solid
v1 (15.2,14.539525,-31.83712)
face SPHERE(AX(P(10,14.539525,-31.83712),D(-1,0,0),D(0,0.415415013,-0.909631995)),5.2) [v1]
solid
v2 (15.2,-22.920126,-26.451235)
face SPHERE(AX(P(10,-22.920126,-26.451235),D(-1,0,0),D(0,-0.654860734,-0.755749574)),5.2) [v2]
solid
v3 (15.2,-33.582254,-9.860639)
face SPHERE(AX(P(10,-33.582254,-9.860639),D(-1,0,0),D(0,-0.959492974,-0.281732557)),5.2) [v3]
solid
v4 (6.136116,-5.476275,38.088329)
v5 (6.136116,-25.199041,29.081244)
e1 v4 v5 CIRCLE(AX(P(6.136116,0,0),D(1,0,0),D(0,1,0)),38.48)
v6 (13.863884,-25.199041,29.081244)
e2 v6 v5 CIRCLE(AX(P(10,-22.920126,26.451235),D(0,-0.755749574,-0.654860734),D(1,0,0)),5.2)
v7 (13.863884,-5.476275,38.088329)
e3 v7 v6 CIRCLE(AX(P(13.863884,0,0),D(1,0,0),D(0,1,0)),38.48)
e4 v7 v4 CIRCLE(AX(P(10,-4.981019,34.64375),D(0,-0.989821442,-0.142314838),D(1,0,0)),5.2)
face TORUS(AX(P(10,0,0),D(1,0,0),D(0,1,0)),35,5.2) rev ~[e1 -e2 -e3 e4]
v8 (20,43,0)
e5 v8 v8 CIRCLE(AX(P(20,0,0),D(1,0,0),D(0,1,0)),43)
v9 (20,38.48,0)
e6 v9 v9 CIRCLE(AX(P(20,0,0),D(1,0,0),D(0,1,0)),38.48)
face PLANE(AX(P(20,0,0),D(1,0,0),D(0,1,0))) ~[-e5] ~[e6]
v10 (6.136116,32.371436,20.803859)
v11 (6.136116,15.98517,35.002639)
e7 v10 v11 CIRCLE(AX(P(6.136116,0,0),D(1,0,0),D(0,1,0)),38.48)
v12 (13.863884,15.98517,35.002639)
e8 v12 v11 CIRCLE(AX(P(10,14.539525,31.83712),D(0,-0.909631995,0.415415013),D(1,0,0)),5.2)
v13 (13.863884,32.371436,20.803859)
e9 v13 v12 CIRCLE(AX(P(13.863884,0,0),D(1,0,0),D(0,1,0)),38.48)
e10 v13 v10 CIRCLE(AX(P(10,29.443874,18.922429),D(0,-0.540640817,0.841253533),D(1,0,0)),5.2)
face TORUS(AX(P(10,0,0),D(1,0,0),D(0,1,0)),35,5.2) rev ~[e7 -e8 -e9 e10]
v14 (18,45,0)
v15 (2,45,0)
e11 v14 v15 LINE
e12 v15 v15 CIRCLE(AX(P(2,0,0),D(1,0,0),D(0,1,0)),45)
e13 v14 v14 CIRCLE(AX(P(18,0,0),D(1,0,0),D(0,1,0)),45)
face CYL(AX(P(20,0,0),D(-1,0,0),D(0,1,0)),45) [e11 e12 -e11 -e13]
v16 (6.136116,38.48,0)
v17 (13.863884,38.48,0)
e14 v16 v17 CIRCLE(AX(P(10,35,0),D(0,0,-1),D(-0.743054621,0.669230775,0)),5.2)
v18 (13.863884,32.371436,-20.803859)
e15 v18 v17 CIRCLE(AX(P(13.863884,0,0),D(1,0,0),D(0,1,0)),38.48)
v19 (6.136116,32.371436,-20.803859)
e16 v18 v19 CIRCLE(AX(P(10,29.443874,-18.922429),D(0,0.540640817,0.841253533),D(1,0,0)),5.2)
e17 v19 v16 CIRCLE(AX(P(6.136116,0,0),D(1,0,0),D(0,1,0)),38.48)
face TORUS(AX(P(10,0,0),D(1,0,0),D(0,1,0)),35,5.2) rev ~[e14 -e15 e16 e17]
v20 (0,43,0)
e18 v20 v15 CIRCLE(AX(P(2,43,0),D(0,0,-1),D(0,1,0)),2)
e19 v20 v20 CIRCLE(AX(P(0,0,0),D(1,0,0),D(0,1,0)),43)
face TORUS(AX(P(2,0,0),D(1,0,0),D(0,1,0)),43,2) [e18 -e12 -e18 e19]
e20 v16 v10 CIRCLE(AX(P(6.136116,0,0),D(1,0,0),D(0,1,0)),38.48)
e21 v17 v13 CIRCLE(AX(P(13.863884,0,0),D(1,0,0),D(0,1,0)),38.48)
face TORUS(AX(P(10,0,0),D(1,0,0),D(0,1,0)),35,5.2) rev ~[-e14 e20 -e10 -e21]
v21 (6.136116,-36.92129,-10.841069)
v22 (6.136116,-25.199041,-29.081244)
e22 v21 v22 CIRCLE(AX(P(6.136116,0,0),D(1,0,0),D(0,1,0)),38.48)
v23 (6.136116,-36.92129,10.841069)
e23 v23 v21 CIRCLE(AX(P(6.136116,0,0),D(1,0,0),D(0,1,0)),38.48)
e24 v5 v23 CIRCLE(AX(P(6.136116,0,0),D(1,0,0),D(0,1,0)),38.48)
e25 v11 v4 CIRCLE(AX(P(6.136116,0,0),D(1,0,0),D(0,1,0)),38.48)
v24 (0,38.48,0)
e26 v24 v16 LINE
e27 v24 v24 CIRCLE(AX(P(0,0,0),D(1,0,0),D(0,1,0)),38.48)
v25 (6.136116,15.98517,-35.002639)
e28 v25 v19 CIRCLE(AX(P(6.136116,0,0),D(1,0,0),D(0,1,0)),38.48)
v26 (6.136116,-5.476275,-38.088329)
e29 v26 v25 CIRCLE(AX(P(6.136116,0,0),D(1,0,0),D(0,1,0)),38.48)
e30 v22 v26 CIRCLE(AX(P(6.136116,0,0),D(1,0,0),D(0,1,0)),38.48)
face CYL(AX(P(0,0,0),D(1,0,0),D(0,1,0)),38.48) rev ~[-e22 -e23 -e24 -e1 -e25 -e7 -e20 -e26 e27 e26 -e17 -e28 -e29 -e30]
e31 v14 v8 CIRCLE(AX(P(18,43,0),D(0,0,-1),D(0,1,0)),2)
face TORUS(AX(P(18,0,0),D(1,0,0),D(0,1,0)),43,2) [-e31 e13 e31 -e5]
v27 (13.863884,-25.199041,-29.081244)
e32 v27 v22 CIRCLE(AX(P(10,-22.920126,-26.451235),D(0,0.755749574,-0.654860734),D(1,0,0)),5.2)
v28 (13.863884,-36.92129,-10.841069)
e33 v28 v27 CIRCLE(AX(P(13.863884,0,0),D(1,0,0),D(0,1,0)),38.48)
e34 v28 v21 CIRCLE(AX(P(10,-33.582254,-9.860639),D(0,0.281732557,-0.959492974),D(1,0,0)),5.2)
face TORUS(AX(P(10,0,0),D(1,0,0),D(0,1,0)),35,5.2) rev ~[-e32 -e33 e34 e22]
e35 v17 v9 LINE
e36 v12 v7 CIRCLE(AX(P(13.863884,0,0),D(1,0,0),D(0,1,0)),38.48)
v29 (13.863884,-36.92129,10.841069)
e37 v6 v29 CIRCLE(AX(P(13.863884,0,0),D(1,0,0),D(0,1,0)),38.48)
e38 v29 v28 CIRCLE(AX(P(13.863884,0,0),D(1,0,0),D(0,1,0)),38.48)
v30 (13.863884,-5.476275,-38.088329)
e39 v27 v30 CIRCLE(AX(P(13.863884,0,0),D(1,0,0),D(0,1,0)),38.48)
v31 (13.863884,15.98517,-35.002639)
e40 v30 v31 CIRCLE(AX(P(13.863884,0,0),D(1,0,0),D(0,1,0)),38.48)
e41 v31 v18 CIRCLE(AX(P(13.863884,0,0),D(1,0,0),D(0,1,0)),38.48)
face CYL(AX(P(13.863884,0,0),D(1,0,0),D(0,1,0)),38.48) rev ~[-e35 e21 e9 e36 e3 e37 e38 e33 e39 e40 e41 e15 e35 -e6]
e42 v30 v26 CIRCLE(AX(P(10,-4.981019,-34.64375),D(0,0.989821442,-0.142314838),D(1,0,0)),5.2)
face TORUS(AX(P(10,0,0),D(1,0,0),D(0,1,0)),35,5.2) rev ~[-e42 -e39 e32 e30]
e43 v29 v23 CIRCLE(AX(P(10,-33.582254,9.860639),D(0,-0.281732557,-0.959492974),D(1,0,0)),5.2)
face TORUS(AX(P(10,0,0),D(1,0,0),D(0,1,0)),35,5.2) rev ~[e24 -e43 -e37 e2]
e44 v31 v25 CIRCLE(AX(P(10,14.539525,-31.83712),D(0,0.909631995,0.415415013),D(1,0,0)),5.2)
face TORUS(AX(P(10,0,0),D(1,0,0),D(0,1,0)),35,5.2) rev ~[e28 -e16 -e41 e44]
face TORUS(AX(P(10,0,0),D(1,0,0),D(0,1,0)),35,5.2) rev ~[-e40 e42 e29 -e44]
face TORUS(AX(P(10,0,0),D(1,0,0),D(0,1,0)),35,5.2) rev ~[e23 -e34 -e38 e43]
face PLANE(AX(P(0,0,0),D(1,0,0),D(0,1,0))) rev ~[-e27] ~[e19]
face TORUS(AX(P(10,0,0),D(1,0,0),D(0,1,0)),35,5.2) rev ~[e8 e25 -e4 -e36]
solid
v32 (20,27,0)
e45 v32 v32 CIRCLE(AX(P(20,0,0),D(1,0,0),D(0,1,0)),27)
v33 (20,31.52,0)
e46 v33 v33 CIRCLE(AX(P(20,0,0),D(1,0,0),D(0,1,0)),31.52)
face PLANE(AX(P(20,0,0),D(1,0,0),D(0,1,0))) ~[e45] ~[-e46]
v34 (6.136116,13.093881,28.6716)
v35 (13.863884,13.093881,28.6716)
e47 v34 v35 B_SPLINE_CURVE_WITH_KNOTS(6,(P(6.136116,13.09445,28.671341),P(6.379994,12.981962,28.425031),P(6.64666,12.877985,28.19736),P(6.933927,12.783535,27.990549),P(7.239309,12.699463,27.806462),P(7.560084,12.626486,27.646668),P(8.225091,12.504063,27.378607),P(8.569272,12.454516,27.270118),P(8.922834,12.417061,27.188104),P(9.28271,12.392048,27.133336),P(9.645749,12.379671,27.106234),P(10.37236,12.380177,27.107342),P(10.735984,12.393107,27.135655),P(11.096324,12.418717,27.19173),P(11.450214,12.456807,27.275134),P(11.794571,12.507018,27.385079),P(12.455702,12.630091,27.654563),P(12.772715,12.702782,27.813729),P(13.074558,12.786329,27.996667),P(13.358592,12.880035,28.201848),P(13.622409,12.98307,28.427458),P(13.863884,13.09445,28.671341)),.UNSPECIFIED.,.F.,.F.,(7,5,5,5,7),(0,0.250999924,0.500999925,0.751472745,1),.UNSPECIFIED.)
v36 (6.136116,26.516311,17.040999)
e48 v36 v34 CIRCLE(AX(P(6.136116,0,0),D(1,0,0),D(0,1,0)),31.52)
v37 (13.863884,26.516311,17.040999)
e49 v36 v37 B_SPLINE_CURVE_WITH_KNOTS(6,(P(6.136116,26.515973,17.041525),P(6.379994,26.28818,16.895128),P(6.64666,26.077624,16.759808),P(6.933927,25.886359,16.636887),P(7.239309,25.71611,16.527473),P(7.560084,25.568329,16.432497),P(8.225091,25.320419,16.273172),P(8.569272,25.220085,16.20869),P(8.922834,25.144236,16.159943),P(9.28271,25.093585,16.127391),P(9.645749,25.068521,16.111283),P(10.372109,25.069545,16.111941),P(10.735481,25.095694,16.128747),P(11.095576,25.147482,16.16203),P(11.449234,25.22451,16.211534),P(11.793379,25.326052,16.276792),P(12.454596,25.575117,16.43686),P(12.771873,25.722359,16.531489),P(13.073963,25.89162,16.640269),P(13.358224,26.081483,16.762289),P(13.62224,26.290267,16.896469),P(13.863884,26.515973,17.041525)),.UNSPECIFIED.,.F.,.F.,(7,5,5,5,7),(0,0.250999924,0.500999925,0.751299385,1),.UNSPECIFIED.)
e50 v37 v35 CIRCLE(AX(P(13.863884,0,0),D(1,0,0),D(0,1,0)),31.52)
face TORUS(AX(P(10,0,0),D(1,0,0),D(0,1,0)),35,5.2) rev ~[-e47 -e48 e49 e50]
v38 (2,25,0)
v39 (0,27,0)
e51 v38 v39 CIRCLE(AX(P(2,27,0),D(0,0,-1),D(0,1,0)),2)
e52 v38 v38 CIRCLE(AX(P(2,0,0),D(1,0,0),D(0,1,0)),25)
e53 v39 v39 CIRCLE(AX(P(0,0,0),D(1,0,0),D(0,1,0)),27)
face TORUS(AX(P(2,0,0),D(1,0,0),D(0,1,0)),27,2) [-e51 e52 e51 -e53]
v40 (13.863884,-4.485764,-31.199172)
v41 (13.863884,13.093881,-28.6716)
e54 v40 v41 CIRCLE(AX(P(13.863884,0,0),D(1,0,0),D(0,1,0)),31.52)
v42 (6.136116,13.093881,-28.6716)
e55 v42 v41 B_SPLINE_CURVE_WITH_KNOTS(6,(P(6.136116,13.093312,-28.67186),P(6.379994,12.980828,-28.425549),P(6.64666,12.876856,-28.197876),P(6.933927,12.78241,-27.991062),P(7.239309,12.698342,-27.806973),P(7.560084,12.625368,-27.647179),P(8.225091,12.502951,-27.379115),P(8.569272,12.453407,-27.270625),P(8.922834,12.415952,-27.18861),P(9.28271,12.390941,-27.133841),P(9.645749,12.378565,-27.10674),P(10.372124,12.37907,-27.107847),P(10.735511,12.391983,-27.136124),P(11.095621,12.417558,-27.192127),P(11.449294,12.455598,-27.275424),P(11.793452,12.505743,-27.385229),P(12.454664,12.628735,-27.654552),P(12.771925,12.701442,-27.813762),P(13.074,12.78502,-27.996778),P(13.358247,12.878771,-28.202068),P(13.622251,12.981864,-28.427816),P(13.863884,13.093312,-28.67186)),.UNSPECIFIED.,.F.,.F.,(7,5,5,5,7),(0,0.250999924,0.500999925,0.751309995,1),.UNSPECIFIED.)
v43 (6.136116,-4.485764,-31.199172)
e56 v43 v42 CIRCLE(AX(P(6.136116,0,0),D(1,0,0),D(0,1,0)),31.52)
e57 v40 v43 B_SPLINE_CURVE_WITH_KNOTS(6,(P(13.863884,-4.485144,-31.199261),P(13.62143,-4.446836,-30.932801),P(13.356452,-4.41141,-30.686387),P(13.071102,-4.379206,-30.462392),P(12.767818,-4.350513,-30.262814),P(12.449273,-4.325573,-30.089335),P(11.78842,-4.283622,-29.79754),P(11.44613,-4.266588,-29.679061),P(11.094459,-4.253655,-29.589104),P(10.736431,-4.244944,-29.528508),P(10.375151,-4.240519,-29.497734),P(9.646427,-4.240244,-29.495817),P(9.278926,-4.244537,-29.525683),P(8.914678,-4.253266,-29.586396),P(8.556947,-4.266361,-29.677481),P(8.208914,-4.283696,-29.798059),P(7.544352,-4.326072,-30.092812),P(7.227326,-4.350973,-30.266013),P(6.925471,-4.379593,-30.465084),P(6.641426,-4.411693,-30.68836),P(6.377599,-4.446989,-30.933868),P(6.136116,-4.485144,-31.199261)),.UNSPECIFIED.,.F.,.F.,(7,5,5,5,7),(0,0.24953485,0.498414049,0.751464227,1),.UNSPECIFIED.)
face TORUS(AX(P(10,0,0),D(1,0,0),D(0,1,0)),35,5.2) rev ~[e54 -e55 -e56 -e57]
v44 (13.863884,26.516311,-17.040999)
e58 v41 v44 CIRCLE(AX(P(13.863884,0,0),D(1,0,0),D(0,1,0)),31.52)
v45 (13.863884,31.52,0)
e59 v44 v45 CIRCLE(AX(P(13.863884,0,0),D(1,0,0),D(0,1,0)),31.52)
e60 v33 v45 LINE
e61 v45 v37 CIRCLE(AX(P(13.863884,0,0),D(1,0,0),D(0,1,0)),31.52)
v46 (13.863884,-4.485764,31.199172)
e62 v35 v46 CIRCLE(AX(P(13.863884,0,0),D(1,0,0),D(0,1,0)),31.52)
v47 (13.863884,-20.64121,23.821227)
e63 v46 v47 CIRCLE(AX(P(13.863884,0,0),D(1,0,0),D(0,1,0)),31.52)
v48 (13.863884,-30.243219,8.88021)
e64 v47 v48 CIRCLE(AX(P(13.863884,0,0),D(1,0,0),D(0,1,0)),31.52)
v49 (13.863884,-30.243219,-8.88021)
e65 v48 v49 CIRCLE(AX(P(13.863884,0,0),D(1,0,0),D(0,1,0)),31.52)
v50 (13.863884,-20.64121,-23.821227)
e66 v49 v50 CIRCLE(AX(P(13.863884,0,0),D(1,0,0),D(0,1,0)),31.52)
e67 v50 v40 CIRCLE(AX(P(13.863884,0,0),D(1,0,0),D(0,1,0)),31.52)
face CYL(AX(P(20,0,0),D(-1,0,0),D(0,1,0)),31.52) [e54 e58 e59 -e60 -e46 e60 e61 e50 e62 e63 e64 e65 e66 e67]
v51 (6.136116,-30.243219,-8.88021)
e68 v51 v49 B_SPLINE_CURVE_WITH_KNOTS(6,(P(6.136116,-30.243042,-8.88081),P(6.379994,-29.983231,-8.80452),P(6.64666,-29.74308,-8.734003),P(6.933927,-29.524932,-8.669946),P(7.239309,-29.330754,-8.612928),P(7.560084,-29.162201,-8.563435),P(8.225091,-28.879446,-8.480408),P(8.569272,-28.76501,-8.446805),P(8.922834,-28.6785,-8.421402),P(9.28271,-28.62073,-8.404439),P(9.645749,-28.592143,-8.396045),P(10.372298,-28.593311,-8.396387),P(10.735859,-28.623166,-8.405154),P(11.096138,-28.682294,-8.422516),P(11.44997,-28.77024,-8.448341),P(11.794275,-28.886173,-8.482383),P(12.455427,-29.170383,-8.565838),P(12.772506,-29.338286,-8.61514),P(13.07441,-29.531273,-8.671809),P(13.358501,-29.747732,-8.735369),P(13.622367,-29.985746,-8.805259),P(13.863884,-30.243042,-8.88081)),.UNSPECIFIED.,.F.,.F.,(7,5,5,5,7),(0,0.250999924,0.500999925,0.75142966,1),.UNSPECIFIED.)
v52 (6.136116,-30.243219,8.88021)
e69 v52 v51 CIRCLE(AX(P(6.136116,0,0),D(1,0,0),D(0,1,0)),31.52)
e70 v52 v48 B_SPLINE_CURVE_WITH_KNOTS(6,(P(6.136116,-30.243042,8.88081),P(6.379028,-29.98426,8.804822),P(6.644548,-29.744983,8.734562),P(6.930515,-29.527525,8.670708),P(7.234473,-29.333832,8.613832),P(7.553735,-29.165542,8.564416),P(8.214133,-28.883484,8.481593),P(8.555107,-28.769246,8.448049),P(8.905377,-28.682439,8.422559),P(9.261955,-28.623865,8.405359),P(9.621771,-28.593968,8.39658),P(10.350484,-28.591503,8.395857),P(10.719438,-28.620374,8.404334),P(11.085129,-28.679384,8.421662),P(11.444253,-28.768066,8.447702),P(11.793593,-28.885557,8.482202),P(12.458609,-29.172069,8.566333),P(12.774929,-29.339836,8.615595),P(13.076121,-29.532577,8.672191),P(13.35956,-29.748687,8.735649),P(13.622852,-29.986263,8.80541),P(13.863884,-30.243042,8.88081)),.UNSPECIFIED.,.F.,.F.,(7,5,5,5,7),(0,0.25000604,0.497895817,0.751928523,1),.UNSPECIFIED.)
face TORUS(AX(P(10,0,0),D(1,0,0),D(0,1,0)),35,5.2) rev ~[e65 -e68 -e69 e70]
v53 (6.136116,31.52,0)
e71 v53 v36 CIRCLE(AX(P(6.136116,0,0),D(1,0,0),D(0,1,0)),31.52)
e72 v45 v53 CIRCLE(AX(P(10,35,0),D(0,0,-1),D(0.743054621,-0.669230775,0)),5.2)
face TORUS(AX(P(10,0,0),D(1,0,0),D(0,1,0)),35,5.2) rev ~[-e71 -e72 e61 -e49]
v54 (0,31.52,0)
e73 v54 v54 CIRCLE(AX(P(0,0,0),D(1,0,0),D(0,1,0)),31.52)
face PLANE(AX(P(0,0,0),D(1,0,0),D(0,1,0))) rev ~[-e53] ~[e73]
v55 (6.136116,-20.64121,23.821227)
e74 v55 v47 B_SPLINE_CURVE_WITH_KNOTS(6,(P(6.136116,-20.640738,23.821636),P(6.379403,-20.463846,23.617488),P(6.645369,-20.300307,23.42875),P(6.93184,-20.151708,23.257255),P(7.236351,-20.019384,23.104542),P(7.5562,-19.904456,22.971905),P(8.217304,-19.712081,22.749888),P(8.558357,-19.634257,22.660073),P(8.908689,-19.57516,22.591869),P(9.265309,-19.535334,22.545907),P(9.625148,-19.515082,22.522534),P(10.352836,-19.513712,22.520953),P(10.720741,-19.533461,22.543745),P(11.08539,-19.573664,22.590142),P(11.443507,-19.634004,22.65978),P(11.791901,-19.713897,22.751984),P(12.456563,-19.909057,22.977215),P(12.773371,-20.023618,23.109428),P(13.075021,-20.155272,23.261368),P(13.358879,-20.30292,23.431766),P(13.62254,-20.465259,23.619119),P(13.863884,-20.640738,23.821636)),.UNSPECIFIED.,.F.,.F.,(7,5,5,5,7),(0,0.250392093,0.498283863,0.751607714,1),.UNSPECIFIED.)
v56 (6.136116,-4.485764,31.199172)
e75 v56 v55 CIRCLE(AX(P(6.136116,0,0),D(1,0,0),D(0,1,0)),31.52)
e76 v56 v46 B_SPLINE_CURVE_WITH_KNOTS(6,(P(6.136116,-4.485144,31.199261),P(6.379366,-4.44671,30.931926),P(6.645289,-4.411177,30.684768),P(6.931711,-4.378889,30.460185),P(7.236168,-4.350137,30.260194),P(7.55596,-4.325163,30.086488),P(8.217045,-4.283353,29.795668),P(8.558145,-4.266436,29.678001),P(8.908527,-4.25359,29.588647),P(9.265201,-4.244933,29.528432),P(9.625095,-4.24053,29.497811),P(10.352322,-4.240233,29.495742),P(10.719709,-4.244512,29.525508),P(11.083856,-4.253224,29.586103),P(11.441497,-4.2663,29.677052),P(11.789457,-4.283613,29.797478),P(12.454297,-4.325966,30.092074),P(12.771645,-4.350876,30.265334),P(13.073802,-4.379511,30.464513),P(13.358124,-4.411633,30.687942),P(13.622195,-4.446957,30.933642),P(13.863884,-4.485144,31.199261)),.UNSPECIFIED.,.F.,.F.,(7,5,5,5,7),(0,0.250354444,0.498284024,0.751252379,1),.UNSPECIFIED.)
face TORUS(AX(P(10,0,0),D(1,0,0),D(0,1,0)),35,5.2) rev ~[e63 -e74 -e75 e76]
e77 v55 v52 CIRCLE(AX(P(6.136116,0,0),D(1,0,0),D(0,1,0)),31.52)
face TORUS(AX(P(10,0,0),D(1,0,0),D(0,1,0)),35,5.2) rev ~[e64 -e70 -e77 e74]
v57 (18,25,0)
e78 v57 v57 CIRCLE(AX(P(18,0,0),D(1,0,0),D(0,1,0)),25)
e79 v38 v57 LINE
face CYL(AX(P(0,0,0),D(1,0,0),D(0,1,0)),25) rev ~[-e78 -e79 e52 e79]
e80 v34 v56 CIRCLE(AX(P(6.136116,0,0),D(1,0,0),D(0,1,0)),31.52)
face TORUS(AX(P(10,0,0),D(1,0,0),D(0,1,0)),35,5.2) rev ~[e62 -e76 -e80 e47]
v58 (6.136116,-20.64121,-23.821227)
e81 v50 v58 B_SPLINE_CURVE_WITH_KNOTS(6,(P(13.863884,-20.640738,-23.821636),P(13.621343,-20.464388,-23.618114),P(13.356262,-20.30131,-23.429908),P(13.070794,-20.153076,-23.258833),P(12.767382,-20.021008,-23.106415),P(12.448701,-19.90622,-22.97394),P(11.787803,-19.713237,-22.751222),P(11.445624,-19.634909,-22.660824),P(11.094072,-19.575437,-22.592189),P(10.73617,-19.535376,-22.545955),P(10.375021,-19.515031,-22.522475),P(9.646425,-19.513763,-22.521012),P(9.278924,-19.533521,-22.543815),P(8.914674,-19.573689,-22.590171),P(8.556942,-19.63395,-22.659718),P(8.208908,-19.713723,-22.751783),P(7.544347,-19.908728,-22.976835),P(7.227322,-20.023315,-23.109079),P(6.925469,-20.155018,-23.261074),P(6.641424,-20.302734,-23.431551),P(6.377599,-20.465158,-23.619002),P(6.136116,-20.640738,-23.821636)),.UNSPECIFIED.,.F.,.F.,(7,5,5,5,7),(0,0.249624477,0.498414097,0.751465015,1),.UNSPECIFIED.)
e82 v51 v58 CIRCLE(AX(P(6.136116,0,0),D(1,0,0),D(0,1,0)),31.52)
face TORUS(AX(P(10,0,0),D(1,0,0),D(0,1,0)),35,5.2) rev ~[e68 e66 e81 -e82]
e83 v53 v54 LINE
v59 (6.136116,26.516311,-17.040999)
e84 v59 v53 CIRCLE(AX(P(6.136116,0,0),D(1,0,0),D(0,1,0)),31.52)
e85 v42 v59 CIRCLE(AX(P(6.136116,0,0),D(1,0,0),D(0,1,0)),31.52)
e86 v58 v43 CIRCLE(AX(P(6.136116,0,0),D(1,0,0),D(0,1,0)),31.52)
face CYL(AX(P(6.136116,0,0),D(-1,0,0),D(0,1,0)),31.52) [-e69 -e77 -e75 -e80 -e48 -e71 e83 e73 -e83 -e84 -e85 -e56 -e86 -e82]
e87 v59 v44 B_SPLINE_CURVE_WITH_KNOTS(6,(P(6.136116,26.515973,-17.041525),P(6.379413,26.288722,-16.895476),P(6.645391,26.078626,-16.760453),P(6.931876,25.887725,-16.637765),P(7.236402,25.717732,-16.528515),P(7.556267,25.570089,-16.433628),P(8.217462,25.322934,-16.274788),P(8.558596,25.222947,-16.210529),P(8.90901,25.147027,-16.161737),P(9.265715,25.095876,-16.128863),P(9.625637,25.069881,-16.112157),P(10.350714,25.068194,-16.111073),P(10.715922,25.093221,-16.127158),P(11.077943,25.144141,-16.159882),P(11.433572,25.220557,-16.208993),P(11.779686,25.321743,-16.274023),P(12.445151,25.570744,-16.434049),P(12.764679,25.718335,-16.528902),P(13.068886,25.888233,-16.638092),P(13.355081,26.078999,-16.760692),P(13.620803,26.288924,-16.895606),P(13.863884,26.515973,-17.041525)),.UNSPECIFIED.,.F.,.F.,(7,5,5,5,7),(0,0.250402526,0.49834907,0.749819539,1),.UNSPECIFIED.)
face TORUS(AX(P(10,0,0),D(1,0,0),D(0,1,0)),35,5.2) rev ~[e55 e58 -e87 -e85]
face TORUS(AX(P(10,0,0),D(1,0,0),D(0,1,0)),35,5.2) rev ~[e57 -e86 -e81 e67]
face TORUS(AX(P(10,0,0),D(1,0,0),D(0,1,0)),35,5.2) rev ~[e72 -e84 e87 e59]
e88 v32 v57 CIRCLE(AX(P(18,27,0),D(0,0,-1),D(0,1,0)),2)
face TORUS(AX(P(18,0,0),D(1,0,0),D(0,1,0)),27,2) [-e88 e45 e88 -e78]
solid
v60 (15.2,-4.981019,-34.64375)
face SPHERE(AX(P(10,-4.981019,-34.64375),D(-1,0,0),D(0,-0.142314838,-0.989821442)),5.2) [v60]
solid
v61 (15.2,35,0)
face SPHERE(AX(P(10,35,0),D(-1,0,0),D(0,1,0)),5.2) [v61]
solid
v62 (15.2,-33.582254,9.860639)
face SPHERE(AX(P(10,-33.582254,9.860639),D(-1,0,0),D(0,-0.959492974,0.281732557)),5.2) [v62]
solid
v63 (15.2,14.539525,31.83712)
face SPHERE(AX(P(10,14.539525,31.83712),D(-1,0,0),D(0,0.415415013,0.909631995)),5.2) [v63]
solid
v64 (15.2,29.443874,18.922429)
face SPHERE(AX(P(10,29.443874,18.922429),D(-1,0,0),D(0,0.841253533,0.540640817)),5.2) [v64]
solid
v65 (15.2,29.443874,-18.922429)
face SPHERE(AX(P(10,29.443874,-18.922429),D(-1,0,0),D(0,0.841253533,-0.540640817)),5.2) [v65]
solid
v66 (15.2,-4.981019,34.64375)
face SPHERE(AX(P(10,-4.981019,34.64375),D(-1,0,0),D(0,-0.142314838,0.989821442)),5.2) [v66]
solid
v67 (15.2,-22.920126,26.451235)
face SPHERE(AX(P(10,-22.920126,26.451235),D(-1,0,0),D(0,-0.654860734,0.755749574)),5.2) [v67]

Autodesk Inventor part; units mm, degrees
ref_plane "YZ Plane" through (0, 0, 0) normal (1, 0, 0) x (0, 1, 0)
ref_plane "XZ Plane" through (0, 0, 0) normal (0, 1, 0) x (-1, 0, 0)
ref_plane "XY Plane" through (0, 0, 0) normal (0, 0, 1) x (1, 0, 0)
sketch "Эскиз" plane through (0, 0, 0) normal (0, 0, 1) x (1, 0, 0)
  line L0 (10, 29.8) -> (10, 40.2)
  circle A0 centre (10, 35) radius 5.2
  line L1 (6.136116, 38.48) -> (0, 38.48)
  line L2 (6.136116, 31.52) -> (0, 31.52)
  line L3 (0, 25) -> (20, 25)
  line L4 (0, 45) -> (20, 45)
  line L5 (20, 25) -> (20, 31.52)
  line L6 (20, 38.48) -> (20, 45)
  line L7 (13.863884, 38.48) -> (20, 38.48)
  line L8 (13.863884, 31.52) -> (20, 31.52)
  line L9 (10, 35) -> (15.2, 35)
  line L10 (10, 35) -> (4.8, 35)
  line L11 (-1.4, 0) -> (8.4, 0)
  line L12 (0, -0.5) -> (0, 4.75)
  dimension "d3" = 10.4
  dimension "d7" = 50
  dimension "d8" = 90
  dimension "d10" = 20
  dimension "d11" = 70
  dimension "d13" = 63.04
  dimension "d15" = 76.96
sketch "Эскиз outline for Базовый элемент" plane through (0, 0, 0) normal (0, 0, 1) x (1, 0, 0)
  line L0 (0, 31.52) -> (0, 25)
  line L1 (0, 25) -> (20, 25)
  line L2 (20, 25) -> (20, 31.52)
  line L3 (20, 31.52) -> (13.863884, 31.52)
  arc A0 (13.863884, 31.52) -> (6.136116, 31.52) centre (10, 35) cw
  line L4 (6.136116, 31.52) -> (0, 31.52)
  arc A1 (6.136116, 38.48) -> (13.863884, 38.48) centre (10, 35) cw
  line L5 (13.863884, 38.48) -> (20, 38.48)
  line L6 (20, 38.48) -> (20, 45)
  line L7 (20, 45) -> (0, 45)
  line L8 (0, 45) -> (0, 38.48)
  line L9 (0, 38.48) -> (6.136116, 38.48)
revolve "Базовый элемент" add sketch "Эскиз outline for Базовый элемент" angle 360 about axis through (-10, 0, 0) along (1, 0, 0)
fillet "Сопряжение1" radius 2 4 edges at (0, -25, 0) (20, -25, 0) (0, -45, 0) (20, -45, 0)
revolve "Шарик" add sketch "Эскиз" angle 360 about axis through (10, 35, 0) along (-1, 0, 0) picked at (6.58484, 35.419407) picked at (13.41516, 35.419407) contours L10 A0 L0 | L0 A0 L9
pattern_circular "Шарики" count 11 over 360 about axis through (-10, 0, 0) along (1, 0, 0) of "Шарик"
equation "\"d3\" = 0.26 * BD - 0.26 * WD"
equation "\"d7\" = WD"
equation "\"d8\" = BD"
equation "\"d10\" = KB"
equation "\"d11\" = 0.5 * WD + 0.5 * BD"
equation "\"d13\" = 0.326 * BD + 0.674 * WD"
equation "\"d15\" = 0.674 * BD + 0.326 * WD"
equation "\"d0\" = KRS"
equation "\"WD\" = 50"
equation "\"BD\" = 90"
equation "\"KB\" = 20"
equation "\"KRS\" = 2"
equation "\"BBA\" = 0"
equation "\"BR\" = 0.5 * BD"
equation "\"WR\" = 0.5 * WD"
properties part number "Подшипник 210 ГОСТ 8338-75" material "Сталь, мягкая"
